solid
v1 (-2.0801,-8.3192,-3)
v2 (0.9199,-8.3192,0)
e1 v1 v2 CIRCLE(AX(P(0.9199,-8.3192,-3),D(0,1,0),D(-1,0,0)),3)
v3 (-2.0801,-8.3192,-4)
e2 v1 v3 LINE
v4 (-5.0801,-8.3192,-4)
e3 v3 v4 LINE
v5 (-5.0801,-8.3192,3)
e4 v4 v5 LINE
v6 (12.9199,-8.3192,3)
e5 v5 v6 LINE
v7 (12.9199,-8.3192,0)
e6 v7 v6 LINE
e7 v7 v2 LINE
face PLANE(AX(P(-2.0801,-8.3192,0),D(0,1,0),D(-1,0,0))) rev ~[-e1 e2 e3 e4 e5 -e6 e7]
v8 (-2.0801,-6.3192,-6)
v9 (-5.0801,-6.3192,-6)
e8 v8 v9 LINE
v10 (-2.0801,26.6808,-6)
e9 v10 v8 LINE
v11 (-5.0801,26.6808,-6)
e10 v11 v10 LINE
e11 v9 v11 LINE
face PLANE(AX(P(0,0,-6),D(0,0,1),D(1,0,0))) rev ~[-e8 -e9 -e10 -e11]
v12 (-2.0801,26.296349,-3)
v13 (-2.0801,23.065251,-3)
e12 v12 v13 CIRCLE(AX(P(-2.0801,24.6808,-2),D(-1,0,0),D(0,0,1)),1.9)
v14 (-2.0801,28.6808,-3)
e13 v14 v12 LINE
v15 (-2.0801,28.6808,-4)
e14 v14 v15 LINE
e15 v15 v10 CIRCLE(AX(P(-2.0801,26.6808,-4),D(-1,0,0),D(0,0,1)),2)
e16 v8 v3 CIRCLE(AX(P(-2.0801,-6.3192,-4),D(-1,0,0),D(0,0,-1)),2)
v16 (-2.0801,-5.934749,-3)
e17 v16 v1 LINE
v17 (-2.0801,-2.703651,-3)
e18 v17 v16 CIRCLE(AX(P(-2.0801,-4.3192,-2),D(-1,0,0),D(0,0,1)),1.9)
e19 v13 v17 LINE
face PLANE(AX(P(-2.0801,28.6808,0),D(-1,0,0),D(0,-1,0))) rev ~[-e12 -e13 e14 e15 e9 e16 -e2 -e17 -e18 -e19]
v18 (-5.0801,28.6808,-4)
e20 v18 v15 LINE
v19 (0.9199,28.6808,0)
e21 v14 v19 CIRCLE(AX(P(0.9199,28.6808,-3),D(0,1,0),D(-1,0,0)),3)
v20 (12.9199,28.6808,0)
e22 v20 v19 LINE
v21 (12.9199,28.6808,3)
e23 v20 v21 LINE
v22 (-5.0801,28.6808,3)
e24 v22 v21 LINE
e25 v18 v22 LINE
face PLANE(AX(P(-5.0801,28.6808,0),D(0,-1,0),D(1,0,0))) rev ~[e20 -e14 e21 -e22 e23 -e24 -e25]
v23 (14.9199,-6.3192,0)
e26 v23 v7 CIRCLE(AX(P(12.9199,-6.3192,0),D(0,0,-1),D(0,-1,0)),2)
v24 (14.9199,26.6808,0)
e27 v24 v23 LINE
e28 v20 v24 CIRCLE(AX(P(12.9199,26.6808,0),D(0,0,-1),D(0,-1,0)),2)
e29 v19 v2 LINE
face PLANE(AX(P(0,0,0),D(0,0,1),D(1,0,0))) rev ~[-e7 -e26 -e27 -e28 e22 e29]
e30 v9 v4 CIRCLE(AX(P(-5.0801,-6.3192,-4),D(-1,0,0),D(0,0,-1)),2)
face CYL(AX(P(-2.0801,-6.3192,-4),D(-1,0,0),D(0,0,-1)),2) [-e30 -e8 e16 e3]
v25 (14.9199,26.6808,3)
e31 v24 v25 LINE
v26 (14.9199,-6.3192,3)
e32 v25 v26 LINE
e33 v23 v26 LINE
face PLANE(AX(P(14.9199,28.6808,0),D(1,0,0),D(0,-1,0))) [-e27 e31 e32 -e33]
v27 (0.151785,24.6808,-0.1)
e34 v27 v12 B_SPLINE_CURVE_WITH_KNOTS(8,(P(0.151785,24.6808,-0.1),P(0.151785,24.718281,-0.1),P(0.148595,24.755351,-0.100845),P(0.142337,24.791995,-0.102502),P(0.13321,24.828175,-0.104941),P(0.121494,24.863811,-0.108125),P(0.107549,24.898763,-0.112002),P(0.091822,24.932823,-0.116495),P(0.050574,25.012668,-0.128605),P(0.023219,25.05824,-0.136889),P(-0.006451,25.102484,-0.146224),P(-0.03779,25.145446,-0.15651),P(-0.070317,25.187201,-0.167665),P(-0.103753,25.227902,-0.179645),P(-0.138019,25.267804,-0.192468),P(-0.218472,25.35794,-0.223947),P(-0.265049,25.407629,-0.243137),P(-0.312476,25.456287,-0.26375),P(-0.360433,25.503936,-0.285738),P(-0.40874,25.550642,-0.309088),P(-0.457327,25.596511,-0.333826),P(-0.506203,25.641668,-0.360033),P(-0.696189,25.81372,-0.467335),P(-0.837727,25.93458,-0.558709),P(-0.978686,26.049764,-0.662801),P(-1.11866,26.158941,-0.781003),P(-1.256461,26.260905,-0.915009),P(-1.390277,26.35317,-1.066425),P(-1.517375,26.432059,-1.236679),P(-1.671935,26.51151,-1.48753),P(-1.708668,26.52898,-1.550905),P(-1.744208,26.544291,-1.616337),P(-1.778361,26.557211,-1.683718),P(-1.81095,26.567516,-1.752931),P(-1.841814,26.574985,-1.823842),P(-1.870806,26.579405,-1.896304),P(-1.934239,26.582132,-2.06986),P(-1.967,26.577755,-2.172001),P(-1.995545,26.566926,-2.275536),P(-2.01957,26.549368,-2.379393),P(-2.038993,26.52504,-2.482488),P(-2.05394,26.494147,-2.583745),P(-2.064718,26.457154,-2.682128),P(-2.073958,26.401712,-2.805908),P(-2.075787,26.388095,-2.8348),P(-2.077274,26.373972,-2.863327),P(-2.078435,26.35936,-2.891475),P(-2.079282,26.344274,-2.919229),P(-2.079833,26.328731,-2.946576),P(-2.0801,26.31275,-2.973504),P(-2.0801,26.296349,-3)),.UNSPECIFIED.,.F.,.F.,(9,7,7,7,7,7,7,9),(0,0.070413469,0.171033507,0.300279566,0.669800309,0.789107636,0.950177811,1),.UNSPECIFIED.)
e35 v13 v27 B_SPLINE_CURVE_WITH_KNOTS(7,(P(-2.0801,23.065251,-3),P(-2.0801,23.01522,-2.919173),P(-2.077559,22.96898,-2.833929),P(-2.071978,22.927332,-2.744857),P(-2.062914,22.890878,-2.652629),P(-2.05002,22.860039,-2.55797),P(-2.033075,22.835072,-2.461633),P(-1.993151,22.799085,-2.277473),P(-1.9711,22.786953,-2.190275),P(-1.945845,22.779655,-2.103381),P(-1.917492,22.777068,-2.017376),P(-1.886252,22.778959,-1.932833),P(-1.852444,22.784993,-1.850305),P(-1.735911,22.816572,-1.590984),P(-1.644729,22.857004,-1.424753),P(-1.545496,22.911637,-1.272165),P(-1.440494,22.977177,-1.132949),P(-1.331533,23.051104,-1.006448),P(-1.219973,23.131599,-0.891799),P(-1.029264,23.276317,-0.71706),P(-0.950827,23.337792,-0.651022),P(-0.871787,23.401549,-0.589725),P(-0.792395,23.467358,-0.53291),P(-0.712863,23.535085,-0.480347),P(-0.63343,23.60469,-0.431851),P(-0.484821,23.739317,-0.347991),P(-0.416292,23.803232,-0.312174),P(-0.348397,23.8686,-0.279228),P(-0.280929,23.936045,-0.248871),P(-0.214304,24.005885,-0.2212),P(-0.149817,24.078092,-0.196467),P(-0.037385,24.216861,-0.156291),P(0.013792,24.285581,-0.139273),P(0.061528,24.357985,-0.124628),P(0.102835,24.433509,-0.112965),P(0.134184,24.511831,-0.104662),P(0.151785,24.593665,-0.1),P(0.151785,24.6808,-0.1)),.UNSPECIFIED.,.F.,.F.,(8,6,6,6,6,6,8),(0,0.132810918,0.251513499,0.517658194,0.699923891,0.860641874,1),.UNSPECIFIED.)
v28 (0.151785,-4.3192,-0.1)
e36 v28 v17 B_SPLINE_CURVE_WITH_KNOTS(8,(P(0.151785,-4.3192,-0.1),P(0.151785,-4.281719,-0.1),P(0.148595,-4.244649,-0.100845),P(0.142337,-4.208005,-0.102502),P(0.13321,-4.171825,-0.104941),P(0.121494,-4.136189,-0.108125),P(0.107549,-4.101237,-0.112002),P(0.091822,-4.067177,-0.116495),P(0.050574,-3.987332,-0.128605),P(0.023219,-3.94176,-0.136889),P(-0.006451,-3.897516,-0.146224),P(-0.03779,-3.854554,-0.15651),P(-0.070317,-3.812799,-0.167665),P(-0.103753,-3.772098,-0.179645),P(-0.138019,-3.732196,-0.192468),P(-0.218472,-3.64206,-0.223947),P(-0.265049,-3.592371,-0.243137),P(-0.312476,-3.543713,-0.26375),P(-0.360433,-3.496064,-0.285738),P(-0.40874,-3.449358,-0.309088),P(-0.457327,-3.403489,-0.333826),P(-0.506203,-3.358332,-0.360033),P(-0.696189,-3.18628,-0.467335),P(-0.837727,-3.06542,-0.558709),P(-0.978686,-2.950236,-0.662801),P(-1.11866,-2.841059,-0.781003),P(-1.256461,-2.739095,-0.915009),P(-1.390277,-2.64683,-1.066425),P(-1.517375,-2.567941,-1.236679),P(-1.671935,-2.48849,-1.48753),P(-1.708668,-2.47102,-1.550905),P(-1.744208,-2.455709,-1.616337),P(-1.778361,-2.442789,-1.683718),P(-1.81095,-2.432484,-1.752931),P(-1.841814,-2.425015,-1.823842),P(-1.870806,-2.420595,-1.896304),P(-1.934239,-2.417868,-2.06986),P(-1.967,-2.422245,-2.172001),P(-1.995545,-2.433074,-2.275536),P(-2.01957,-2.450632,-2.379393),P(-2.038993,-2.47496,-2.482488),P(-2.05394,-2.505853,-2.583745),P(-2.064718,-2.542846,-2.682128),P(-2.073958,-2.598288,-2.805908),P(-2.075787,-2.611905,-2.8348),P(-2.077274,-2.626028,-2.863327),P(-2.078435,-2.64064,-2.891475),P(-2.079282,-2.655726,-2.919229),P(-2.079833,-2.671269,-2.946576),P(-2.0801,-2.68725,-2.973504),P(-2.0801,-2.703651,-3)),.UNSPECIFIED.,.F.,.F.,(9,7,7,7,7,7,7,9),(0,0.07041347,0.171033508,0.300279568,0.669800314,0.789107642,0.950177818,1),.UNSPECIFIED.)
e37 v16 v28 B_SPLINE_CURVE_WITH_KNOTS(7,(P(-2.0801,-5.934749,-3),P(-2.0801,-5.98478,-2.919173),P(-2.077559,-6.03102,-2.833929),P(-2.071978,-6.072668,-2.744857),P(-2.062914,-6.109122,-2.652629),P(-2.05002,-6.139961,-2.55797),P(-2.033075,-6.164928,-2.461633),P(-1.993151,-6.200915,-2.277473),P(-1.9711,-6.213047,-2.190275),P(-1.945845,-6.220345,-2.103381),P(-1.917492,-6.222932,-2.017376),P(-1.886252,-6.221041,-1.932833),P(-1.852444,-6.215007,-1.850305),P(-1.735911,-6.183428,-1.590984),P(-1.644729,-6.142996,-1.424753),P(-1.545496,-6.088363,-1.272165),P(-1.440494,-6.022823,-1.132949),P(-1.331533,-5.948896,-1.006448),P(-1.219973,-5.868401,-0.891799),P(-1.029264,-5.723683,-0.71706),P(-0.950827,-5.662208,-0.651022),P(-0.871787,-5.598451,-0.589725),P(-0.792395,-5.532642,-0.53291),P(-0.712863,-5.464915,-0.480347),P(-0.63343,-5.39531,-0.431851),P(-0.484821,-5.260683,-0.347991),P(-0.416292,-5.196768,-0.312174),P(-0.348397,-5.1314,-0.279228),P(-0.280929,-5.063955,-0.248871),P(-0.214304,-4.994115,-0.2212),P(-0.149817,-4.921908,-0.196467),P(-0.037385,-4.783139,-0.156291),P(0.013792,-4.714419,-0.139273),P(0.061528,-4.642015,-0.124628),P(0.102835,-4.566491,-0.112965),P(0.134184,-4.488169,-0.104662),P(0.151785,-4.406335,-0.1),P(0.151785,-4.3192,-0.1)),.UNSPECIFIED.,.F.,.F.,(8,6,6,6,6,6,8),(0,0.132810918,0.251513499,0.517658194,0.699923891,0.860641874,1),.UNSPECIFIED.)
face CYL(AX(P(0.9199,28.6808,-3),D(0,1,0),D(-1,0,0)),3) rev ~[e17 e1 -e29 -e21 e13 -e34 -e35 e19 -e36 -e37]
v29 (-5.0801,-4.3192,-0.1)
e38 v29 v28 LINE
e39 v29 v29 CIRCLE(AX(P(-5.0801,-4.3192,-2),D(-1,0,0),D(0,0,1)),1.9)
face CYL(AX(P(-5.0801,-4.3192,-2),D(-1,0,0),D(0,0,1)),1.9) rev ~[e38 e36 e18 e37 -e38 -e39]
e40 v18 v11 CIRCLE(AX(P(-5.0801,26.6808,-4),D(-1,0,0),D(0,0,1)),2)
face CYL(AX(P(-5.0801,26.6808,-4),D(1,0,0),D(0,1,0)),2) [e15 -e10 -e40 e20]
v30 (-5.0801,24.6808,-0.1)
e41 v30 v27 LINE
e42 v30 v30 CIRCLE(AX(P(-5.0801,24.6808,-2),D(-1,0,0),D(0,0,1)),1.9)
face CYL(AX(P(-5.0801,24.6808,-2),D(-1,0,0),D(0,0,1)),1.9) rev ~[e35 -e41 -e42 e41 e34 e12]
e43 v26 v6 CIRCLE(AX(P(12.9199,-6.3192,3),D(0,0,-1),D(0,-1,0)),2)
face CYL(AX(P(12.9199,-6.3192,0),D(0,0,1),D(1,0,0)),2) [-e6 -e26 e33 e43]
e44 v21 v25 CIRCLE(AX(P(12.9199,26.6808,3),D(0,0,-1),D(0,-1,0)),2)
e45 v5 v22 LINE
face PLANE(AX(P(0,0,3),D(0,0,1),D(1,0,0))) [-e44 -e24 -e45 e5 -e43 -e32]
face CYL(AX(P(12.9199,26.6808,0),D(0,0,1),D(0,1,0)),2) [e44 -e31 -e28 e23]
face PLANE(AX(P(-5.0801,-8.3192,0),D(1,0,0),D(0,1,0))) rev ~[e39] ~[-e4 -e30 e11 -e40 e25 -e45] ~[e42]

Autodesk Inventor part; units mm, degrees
ref_plane "YZ Plane" through (0, 0, 0) normal (1, 0, 0) x (0, 1, 0)
ref_plane "XZ Plane" through (0, 0, 0) normal (0, 1, 0) x (-1, 0, 0)
ref_plane "XY Plane" through (0, 0, 0) normal (0, 0, 1) x (1, 0, 0)
sketch "Sketch1" plane through (0, 0, 0) normal (0, 0, 1) x (1, 0, 0)
  line L0 (-5.0801, 28.6808) -> (14.9199, 28.6808)
  line L1 (14.9199, 28.6808) -> (14.9199, -8.3192)
  line L2 (14.9199, -8.3192) -> (-5.0801, -8.3192)
  line L3 (-5.0801, -8.3192) -> (-5.0801, 28.6808)
  line L4 (-5.0801, 28.6808) -> (-2.0801, 28.6808)
  line L5 (-2.0801, 28.6808) -> (-2.0801, -8.3192)
  line L6 (-2.0801, -8.3192) -> (-5.0801, -8.3192)
  line L7 (-5.0801, -8.3192) -> (-5.0801, 28.6808)
  point P0 (0, 0)
  dimension "d0" = 3
  dimension "d1" = 17
  dimension "d12" = 37
extrude "Extrusion1" add sketch "Sketch1" along normal blind 3
extrude "Extrusion2" add sketch "Sketch1" against normal blind 6 contours L0 L5 L2 L3
sketch "Sketch2" plane through (-5.0801, -8.3192, 3) normal (-1, 0, 0) x (0, 0, 1)
  circle A0 centre (-5, 4) radius 1.9
  circle A1 centre (-5, 33) radius 1.9
  line L0 (-3, 0) -> (-3, 37) projected
  line L1 (-9, 0) -> (0, 0) projected
  line L2 (-9, 37) -> (0, 37) projected
  line L3 (-9, 0) -> (-9, 37) projected
  line L4 (0, 37) -> (0, 0) projected
  point P0 (-3, 8.3192)
  dimension "d6" = 3.8
  dimension "d7" = 3.8
  dimension "d10" = 4
  dimension "d11" = 4
  dimension "d17" = 4
  dimension "d18" = 4
  dimension "d19" = 5
extrude "Extrusion3" cut sketch "Sketch2" against normal blind 6 contours A0 | A1
fillet "Fillet1" radius 3 1 edges at (-2.0801, 10.1808, 0)
fillet "Fillet2" radius 2 4 edges at (-3.5801, 28.6808, -6) (-3.5801, -8.3192, -6) (14.9199, 28.6808, 1.5) (14.9199, -8.3192, 1.5)
sketch "Sketch3" plane through (0, 0, 3) normal (0, 0, 1) x (1, 0, 0)
  point P0 (0, 0)
properties part number "psu side brace"
